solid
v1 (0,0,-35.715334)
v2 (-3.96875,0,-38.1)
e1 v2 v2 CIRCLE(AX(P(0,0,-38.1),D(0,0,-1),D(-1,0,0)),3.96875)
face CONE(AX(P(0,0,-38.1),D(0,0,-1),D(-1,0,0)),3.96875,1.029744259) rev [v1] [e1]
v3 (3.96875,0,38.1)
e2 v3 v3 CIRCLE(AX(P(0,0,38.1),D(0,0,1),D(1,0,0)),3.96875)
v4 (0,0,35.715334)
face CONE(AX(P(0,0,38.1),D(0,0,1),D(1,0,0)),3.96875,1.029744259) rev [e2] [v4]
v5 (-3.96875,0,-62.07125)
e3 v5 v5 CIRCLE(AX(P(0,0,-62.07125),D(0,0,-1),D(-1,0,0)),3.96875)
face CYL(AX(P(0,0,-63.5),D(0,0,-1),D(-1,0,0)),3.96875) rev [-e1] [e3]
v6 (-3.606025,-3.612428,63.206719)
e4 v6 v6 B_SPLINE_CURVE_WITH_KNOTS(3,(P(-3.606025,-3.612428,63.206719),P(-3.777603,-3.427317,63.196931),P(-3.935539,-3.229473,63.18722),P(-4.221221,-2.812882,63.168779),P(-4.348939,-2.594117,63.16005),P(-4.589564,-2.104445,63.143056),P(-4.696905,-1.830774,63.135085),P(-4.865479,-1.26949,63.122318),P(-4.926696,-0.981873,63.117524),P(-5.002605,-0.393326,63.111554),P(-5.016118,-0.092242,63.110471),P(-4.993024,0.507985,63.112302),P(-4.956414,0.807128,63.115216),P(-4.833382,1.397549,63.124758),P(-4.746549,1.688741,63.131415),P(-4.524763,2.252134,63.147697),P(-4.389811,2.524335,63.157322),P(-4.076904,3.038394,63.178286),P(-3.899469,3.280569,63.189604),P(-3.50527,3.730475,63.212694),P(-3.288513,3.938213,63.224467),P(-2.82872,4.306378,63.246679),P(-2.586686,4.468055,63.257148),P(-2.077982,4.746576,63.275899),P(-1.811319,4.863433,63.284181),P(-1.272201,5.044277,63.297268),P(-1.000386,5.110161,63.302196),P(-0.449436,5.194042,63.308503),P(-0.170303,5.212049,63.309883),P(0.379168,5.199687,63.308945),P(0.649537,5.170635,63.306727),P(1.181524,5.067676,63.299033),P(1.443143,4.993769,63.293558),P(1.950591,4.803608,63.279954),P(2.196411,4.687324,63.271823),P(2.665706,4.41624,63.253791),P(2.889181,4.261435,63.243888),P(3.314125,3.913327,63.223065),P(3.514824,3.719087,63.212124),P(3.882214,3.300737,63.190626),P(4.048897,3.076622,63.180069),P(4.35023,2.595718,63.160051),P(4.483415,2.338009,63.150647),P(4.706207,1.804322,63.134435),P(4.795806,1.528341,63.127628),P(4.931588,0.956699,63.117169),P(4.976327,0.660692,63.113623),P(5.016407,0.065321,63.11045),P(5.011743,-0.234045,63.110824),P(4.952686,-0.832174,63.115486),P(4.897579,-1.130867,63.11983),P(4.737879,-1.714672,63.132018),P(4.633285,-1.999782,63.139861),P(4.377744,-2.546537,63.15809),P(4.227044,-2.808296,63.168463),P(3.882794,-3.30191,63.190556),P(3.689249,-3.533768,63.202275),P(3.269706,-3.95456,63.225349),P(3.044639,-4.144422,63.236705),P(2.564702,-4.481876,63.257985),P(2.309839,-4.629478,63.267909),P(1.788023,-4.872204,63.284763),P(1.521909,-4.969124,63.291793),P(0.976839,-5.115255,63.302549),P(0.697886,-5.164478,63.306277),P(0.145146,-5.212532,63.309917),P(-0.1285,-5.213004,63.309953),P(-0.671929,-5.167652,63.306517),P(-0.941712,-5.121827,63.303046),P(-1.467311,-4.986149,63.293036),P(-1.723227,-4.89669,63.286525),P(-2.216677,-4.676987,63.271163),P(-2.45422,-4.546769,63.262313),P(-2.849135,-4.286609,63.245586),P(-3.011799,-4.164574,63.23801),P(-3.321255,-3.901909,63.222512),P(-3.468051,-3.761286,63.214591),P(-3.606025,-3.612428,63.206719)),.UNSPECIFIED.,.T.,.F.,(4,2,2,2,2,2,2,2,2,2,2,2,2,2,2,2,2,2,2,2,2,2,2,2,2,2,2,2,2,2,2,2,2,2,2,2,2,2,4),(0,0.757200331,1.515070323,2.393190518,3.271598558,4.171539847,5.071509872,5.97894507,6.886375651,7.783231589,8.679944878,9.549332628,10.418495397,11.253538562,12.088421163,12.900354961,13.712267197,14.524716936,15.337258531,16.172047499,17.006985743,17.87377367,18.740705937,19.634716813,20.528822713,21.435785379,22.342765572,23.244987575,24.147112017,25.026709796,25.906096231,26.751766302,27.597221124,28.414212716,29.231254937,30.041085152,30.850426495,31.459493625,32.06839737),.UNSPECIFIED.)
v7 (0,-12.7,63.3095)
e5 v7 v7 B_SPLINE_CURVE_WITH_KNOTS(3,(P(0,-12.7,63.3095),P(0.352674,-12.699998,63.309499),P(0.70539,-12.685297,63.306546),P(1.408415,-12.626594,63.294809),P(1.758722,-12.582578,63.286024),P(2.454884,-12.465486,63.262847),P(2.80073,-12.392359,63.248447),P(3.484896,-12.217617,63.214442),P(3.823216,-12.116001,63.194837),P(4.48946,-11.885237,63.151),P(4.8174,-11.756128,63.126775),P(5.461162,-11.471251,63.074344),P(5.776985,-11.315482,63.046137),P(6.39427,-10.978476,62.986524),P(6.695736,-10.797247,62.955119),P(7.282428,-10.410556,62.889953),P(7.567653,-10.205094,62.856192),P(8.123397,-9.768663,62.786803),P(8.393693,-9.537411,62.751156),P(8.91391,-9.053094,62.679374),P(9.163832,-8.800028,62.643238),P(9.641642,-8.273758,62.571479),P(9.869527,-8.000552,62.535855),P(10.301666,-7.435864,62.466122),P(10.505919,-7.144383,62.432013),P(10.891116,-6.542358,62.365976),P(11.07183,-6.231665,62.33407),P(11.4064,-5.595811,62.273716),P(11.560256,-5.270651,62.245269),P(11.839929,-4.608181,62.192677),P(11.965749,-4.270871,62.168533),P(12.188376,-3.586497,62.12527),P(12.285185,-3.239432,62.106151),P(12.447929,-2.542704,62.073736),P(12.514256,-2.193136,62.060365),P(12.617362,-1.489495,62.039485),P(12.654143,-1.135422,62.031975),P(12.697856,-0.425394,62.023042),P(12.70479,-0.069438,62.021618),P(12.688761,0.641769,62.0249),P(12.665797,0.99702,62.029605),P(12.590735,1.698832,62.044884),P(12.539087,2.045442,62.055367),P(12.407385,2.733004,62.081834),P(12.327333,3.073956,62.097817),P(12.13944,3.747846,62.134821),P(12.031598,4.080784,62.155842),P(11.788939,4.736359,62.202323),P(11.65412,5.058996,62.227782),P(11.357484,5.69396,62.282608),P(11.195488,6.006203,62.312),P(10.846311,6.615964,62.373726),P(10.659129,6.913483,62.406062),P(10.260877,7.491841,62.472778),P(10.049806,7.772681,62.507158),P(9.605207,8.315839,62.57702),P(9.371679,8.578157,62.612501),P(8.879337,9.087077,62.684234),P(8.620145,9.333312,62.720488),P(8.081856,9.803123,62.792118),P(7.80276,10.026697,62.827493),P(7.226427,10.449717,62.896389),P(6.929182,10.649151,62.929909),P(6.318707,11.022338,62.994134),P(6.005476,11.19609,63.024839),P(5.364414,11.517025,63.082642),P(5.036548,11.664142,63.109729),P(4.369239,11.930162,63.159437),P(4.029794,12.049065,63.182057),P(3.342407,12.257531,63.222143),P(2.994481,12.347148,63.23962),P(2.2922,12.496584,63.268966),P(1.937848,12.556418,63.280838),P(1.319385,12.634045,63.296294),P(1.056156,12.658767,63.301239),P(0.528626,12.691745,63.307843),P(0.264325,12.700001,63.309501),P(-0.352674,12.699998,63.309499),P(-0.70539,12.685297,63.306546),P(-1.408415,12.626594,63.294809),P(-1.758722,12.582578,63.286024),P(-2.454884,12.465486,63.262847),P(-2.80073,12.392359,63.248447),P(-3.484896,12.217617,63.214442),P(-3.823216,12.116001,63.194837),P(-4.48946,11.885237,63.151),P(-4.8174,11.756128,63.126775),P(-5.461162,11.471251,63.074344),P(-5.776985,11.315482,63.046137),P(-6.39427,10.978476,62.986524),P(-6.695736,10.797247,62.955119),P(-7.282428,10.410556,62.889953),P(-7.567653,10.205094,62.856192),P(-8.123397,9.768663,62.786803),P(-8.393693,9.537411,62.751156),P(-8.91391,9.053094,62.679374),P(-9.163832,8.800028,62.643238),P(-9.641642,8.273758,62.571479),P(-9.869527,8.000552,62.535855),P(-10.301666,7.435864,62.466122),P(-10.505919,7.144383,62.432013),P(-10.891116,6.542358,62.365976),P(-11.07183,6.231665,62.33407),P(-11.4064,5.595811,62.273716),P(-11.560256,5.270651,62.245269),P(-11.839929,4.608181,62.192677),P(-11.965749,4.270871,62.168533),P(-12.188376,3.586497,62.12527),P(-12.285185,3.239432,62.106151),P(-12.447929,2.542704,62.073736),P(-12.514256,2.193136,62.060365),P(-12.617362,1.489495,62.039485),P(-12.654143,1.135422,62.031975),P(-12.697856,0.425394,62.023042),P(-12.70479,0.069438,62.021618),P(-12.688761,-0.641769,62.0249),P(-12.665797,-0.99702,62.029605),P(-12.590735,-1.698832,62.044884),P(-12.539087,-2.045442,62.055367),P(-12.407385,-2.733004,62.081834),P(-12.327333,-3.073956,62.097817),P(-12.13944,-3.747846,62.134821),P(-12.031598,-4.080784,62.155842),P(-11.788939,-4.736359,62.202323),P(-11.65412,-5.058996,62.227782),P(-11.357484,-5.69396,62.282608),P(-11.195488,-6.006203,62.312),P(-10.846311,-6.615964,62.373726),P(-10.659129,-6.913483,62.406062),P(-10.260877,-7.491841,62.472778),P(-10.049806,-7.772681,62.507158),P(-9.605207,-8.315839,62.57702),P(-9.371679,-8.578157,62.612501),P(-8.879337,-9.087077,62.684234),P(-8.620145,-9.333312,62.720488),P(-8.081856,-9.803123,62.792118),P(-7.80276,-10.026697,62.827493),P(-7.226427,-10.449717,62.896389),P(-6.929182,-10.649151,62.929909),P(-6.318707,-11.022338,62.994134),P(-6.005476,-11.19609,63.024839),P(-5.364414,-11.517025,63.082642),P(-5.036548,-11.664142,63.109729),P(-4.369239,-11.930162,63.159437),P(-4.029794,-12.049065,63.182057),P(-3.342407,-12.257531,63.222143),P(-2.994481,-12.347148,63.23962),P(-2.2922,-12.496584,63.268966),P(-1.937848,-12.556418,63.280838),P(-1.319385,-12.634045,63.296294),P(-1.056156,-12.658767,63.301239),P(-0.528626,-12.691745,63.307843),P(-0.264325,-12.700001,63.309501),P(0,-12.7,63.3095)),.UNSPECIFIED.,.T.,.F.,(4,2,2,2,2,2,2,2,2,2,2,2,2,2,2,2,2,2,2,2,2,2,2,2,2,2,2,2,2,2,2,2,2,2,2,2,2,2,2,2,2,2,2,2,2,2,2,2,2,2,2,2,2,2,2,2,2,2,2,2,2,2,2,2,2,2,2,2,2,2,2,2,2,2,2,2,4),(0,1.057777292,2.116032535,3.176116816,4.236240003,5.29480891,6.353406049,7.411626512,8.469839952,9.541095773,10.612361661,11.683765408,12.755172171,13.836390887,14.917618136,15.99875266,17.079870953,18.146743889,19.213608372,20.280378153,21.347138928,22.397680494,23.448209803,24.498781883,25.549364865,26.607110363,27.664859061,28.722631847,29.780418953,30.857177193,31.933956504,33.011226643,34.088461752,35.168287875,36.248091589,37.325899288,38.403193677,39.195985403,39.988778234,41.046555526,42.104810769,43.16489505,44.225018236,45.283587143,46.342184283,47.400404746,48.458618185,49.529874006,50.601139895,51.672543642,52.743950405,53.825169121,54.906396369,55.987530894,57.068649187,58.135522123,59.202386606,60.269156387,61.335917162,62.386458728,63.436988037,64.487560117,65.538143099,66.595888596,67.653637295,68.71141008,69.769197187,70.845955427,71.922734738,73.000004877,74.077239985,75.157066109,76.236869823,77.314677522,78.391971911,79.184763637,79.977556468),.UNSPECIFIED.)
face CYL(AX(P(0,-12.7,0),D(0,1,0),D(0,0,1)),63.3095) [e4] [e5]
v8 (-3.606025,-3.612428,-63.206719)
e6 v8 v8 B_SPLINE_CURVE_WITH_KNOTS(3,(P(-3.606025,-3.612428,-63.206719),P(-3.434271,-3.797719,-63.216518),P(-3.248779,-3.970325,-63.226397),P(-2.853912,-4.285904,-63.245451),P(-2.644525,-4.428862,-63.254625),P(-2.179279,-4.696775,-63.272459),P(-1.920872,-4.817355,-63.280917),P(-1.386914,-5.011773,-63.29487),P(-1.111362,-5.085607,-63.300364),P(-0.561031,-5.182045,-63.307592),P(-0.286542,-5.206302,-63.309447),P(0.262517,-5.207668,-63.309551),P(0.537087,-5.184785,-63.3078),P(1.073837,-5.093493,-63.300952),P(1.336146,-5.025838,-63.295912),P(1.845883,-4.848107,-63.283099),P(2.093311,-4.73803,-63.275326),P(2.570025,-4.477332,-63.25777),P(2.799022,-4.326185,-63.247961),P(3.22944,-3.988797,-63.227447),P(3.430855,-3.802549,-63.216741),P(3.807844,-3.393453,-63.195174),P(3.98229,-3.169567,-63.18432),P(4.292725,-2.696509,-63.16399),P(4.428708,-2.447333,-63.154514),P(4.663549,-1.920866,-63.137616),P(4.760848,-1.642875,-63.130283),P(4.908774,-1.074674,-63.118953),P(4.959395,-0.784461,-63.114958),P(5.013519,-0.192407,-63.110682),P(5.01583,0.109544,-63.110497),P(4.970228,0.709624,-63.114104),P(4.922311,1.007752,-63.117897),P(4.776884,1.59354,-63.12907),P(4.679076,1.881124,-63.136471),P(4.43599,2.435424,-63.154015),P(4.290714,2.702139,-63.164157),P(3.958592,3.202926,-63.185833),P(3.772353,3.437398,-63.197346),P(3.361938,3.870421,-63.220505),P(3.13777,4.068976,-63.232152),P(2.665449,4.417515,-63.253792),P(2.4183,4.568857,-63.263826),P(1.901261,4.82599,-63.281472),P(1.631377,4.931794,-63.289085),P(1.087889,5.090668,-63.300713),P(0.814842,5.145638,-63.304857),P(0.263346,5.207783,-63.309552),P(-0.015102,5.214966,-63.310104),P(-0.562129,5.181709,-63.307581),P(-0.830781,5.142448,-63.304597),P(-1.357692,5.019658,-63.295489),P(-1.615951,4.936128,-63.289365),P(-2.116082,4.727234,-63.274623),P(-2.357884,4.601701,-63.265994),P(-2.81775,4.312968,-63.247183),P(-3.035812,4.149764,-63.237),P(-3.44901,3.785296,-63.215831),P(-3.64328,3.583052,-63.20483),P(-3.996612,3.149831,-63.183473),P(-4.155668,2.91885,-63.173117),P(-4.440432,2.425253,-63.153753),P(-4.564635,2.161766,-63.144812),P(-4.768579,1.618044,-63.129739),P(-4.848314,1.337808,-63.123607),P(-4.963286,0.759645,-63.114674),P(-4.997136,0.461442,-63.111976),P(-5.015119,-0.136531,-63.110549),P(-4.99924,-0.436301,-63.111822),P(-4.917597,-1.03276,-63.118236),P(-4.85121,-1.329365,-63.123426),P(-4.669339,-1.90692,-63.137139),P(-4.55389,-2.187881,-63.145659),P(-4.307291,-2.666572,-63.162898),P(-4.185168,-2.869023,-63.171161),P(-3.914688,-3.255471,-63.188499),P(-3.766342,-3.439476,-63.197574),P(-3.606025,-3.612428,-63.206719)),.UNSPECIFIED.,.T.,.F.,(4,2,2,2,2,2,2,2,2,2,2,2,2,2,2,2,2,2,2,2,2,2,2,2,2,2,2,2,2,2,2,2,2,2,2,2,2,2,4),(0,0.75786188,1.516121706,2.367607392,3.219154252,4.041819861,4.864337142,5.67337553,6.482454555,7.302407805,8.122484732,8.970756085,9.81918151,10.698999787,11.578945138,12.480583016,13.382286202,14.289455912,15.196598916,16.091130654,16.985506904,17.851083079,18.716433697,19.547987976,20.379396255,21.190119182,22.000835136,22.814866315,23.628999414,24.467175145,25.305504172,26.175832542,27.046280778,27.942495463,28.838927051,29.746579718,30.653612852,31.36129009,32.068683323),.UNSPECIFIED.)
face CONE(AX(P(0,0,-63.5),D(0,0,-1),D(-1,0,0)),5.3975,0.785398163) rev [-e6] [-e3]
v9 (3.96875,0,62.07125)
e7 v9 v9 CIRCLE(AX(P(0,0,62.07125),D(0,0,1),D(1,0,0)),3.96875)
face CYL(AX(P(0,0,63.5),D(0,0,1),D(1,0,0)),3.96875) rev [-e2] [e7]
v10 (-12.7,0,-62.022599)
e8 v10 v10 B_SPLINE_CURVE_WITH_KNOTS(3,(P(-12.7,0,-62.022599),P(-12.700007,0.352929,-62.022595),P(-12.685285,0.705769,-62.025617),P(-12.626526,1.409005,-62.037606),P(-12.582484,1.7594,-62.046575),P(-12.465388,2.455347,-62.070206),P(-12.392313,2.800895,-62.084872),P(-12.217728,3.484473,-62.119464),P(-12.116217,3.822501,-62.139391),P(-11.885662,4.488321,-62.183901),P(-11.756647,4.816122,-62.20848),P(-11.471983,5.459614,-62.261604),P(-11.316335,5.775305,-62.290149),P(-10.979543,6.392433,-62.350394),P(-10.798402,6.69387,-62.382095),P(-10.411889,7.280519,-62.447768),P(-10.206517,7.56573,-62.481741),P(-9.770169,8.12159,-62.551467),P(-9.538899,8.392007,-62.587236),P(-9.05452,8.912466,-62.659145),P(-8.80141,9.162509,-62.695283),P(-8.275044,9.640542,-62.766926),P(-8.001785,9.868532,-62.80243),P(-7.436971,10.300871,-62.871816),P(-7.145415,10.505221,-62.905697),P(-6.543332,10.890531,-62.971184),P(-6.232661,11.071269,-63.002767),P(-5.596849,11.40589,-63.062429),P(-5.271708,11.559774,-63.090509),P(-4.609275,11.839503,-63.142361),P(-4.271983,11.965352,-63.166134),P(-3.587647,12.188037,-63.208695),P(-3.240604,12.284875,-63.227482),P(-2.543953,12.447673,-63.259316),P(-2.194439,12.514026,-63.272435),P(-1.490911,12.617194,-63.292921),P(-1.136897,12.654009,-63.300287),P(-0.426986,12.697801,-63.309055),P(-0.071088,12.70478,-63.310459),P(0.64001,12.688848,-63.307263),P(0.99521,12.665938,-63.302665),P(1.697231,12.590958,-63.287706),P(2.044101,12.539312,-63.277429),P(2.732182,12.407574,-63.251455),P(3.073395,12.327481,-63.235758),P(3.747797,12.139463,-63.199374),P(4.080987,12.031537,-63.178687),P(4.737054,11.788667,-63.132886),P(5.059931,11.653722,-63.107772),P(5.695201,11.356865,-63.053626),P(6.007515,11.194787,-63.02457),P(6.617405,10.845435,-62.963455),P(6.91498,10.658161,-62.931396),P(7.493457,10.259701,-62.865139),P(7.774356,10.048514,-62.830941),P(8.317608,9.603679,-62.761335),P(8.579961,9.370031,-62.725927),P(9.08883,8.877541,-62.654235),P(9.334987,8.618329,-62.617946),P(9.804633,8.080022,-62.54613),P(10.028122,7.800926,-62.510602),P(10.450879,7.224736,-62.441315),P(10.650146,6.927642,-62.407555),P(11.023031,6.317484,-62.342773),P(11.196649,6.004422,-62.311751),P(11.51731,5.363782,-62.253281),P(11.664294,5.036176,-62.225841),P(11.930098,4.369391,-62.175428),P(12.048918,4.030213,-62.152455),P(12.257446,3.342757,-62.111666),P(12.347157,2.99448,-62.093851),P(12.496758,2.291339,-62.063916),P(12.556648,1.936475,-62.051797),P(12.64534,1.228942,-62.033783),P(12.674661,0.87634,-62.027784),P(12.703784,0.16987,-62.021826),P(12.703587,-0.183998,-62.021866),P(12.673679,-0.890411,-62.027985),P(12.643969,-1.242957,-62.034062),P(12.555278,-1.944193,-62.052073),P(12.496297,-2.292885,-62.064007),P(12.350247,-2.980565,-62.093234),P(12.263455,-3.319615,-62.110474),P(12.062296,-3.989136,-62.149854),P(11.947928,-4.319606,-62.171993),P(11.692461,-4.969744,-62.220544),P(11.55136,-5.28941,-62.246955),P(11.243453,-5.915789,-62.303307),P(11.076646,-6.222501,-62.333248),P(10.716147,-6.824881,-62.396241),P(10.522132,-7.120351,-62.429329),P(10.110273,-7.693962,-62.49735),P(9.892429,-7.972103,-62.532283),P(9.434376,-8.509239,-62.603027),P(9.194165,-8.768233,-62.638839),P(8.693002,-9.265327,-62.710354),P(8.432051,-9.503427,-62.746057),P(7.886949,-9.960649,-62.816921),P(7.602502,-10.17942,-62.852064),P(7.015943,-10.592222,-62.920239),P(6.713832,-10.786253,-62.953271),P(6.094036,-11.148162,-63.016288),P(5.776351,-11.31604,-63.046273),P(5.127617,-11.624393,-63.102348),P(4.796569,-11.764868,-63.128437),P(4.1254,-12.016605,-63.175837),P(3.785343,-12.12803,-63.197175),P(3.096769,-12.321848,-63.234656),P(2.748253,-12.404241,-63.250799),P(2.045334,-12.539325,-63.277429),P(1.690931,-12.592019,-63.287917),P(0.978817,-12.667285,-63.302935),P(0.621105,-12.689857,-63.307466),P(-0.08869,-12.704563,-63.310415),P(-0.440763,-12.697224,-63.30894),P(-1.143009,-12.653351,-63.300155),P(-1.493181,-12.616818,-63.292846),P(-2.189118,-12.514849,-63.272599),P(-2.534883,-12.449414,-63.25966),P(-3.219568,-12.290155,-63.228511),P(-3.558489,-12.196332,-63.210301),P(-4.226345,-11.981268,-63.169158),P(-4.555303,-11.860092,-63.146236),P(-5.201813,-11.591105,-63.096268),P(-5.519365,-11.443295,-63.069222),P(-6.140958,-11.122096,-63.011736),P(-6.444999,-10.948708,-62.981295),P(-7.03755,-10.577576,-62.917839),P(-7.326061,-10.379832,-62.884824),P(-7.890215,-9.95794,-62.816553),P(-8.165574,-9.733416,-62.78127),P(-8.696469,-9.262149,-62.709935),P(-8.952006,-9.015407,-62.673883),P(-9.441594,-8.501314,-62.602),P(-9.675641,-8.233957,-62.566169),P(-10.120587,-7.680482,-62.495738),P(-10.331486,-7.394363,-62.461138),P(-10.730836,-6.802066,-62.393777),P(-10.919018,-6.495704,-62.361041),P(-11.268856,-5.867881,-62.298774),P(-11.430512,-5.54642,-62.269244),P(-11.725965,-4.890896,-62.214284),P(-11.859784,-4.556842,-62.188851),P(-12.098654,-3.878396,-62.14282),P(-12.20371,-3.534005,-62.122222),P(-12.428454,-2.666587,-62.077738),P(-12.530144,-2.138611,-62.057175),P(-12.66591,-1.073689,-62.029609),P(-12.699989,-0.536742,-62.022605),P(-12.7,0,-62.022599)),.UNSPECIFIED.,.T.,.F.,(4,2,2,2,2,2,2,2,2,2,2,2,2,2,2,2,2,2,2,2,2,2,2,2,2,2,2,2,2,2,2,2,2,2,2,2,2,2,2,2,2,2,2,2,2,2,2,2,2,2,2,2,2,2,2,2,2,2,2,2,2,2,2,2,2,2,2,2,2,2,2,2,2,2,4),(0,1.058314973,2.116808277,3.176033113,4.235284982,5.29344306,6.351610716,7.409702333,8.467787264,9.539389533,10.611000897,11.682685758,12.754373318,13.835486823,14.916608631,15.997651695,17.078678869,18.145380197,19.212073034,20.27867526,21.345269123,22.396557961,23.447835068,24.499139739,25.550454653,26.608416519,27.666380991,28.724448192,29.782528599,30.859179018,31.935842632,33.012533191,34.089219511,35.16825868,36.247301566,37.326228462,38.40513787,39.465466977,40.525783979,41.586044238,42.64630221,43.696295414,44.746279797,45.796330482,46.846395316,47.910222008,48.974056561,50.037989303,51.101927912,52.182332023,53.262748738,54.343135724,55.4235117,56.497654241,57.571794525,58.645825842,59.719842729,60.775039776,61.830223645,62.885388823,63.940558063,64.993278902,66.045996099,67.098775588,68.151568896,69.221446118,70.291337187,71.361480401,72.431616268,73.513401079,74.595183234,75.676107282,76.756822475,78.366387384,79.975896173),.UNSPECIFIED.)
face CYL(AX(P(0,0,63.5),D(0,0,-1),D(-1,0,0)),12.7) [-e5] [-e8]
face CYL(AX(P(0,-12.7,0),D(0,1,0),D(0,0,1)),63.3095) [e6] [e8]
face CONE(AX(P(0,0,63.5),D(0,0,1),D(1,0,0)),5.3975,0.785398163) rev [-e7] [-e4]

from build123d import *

# Parameters (mm, degrees)
SKETCH1_R      = 12.7
EXTRUDE1_DEPTH = 63.5
EXTRUDE2_START = -14
EXTRUDE2_DEPTH = 28


with BuildPart() as part:
    # Sketch1 → Extrude1 (new, symmetric)
    with BuildSketch(Plane.XY):
        Circle(SKETCH1_R)
    extrude(amount=EXTRUDE1_DEPTH, both=True)

    # Sketch4 → 3/8-16 Tapped Hole1 (revolve, cut)
    with BuildSketch(Plane(origin=(0, 0, 63.5), x_dir=(0, -1, 0), z_dir=(1, 0, 0))):
        Polygon((0, 0), (0, 27.784665582), (3.96875, 25.4), (3.96875, 1.42875), (5.3975, 0), align=None)
    f_3_8_16_tapped_hole1 = revolve(axis=Axis((0, 0, 69.85), (0, 0, -1)), mode=Mode.SUBTRACT)

    # Mirror1: 3/8-16 Tapped Hole1 across plane
    add(f_3_8_16_tapped_hole1.mirror(Plane.XY), mode=Mode.SUBTRACT)

    # Extrude2: read off the stored shape, not the designer's step
    # Extrude2 outline → Extrude2 (cut)
    with BuildSketch(Plane(origin=(0, 0, 0), x_dir=(1, 0, 0), z_dir=(0, 1, 0)).offset(EXTRUDE2_START)):
        with BuildLine():
            ThreePointArc((12.700884003, -62.02241801), (0.000451762, -63.309499998), (-12.699998846, -62.022599265))
            Line((-12.699998846, -62.022599265), (-14, -61.756405759))
            Line((-14, -61.756405759), (-14, -63.5))
            Line((-14, -63.5), (14, -63.5))
            Line((14, -63.5), (14, -61.756386435))
            Line((14, -61.756386435), (12.700884003, -62.02241801))
        make_face()
        with BuildLine():
            Line((-14, 63.5), (-14, 61.756405693))
            Line((-14, 61.756405693), (-12.700001857, 62.022598648))
            ThreePointArc((-12.700001857, 62.022598648), (0.000449638, 63.309499998), (12.700882852, 62.022418245))
            Line((12.700882852, 62.022418245), (14, 61.756386459))
            Line((14, 61.756386459), (14, 63.5))
            Line((14, 63.5), (-14, 63.5))
        make_face()
    extrude(amount=EXTRUDE2_DEPTH, mode=Mode.SUBTRACT)


solid = part.part
